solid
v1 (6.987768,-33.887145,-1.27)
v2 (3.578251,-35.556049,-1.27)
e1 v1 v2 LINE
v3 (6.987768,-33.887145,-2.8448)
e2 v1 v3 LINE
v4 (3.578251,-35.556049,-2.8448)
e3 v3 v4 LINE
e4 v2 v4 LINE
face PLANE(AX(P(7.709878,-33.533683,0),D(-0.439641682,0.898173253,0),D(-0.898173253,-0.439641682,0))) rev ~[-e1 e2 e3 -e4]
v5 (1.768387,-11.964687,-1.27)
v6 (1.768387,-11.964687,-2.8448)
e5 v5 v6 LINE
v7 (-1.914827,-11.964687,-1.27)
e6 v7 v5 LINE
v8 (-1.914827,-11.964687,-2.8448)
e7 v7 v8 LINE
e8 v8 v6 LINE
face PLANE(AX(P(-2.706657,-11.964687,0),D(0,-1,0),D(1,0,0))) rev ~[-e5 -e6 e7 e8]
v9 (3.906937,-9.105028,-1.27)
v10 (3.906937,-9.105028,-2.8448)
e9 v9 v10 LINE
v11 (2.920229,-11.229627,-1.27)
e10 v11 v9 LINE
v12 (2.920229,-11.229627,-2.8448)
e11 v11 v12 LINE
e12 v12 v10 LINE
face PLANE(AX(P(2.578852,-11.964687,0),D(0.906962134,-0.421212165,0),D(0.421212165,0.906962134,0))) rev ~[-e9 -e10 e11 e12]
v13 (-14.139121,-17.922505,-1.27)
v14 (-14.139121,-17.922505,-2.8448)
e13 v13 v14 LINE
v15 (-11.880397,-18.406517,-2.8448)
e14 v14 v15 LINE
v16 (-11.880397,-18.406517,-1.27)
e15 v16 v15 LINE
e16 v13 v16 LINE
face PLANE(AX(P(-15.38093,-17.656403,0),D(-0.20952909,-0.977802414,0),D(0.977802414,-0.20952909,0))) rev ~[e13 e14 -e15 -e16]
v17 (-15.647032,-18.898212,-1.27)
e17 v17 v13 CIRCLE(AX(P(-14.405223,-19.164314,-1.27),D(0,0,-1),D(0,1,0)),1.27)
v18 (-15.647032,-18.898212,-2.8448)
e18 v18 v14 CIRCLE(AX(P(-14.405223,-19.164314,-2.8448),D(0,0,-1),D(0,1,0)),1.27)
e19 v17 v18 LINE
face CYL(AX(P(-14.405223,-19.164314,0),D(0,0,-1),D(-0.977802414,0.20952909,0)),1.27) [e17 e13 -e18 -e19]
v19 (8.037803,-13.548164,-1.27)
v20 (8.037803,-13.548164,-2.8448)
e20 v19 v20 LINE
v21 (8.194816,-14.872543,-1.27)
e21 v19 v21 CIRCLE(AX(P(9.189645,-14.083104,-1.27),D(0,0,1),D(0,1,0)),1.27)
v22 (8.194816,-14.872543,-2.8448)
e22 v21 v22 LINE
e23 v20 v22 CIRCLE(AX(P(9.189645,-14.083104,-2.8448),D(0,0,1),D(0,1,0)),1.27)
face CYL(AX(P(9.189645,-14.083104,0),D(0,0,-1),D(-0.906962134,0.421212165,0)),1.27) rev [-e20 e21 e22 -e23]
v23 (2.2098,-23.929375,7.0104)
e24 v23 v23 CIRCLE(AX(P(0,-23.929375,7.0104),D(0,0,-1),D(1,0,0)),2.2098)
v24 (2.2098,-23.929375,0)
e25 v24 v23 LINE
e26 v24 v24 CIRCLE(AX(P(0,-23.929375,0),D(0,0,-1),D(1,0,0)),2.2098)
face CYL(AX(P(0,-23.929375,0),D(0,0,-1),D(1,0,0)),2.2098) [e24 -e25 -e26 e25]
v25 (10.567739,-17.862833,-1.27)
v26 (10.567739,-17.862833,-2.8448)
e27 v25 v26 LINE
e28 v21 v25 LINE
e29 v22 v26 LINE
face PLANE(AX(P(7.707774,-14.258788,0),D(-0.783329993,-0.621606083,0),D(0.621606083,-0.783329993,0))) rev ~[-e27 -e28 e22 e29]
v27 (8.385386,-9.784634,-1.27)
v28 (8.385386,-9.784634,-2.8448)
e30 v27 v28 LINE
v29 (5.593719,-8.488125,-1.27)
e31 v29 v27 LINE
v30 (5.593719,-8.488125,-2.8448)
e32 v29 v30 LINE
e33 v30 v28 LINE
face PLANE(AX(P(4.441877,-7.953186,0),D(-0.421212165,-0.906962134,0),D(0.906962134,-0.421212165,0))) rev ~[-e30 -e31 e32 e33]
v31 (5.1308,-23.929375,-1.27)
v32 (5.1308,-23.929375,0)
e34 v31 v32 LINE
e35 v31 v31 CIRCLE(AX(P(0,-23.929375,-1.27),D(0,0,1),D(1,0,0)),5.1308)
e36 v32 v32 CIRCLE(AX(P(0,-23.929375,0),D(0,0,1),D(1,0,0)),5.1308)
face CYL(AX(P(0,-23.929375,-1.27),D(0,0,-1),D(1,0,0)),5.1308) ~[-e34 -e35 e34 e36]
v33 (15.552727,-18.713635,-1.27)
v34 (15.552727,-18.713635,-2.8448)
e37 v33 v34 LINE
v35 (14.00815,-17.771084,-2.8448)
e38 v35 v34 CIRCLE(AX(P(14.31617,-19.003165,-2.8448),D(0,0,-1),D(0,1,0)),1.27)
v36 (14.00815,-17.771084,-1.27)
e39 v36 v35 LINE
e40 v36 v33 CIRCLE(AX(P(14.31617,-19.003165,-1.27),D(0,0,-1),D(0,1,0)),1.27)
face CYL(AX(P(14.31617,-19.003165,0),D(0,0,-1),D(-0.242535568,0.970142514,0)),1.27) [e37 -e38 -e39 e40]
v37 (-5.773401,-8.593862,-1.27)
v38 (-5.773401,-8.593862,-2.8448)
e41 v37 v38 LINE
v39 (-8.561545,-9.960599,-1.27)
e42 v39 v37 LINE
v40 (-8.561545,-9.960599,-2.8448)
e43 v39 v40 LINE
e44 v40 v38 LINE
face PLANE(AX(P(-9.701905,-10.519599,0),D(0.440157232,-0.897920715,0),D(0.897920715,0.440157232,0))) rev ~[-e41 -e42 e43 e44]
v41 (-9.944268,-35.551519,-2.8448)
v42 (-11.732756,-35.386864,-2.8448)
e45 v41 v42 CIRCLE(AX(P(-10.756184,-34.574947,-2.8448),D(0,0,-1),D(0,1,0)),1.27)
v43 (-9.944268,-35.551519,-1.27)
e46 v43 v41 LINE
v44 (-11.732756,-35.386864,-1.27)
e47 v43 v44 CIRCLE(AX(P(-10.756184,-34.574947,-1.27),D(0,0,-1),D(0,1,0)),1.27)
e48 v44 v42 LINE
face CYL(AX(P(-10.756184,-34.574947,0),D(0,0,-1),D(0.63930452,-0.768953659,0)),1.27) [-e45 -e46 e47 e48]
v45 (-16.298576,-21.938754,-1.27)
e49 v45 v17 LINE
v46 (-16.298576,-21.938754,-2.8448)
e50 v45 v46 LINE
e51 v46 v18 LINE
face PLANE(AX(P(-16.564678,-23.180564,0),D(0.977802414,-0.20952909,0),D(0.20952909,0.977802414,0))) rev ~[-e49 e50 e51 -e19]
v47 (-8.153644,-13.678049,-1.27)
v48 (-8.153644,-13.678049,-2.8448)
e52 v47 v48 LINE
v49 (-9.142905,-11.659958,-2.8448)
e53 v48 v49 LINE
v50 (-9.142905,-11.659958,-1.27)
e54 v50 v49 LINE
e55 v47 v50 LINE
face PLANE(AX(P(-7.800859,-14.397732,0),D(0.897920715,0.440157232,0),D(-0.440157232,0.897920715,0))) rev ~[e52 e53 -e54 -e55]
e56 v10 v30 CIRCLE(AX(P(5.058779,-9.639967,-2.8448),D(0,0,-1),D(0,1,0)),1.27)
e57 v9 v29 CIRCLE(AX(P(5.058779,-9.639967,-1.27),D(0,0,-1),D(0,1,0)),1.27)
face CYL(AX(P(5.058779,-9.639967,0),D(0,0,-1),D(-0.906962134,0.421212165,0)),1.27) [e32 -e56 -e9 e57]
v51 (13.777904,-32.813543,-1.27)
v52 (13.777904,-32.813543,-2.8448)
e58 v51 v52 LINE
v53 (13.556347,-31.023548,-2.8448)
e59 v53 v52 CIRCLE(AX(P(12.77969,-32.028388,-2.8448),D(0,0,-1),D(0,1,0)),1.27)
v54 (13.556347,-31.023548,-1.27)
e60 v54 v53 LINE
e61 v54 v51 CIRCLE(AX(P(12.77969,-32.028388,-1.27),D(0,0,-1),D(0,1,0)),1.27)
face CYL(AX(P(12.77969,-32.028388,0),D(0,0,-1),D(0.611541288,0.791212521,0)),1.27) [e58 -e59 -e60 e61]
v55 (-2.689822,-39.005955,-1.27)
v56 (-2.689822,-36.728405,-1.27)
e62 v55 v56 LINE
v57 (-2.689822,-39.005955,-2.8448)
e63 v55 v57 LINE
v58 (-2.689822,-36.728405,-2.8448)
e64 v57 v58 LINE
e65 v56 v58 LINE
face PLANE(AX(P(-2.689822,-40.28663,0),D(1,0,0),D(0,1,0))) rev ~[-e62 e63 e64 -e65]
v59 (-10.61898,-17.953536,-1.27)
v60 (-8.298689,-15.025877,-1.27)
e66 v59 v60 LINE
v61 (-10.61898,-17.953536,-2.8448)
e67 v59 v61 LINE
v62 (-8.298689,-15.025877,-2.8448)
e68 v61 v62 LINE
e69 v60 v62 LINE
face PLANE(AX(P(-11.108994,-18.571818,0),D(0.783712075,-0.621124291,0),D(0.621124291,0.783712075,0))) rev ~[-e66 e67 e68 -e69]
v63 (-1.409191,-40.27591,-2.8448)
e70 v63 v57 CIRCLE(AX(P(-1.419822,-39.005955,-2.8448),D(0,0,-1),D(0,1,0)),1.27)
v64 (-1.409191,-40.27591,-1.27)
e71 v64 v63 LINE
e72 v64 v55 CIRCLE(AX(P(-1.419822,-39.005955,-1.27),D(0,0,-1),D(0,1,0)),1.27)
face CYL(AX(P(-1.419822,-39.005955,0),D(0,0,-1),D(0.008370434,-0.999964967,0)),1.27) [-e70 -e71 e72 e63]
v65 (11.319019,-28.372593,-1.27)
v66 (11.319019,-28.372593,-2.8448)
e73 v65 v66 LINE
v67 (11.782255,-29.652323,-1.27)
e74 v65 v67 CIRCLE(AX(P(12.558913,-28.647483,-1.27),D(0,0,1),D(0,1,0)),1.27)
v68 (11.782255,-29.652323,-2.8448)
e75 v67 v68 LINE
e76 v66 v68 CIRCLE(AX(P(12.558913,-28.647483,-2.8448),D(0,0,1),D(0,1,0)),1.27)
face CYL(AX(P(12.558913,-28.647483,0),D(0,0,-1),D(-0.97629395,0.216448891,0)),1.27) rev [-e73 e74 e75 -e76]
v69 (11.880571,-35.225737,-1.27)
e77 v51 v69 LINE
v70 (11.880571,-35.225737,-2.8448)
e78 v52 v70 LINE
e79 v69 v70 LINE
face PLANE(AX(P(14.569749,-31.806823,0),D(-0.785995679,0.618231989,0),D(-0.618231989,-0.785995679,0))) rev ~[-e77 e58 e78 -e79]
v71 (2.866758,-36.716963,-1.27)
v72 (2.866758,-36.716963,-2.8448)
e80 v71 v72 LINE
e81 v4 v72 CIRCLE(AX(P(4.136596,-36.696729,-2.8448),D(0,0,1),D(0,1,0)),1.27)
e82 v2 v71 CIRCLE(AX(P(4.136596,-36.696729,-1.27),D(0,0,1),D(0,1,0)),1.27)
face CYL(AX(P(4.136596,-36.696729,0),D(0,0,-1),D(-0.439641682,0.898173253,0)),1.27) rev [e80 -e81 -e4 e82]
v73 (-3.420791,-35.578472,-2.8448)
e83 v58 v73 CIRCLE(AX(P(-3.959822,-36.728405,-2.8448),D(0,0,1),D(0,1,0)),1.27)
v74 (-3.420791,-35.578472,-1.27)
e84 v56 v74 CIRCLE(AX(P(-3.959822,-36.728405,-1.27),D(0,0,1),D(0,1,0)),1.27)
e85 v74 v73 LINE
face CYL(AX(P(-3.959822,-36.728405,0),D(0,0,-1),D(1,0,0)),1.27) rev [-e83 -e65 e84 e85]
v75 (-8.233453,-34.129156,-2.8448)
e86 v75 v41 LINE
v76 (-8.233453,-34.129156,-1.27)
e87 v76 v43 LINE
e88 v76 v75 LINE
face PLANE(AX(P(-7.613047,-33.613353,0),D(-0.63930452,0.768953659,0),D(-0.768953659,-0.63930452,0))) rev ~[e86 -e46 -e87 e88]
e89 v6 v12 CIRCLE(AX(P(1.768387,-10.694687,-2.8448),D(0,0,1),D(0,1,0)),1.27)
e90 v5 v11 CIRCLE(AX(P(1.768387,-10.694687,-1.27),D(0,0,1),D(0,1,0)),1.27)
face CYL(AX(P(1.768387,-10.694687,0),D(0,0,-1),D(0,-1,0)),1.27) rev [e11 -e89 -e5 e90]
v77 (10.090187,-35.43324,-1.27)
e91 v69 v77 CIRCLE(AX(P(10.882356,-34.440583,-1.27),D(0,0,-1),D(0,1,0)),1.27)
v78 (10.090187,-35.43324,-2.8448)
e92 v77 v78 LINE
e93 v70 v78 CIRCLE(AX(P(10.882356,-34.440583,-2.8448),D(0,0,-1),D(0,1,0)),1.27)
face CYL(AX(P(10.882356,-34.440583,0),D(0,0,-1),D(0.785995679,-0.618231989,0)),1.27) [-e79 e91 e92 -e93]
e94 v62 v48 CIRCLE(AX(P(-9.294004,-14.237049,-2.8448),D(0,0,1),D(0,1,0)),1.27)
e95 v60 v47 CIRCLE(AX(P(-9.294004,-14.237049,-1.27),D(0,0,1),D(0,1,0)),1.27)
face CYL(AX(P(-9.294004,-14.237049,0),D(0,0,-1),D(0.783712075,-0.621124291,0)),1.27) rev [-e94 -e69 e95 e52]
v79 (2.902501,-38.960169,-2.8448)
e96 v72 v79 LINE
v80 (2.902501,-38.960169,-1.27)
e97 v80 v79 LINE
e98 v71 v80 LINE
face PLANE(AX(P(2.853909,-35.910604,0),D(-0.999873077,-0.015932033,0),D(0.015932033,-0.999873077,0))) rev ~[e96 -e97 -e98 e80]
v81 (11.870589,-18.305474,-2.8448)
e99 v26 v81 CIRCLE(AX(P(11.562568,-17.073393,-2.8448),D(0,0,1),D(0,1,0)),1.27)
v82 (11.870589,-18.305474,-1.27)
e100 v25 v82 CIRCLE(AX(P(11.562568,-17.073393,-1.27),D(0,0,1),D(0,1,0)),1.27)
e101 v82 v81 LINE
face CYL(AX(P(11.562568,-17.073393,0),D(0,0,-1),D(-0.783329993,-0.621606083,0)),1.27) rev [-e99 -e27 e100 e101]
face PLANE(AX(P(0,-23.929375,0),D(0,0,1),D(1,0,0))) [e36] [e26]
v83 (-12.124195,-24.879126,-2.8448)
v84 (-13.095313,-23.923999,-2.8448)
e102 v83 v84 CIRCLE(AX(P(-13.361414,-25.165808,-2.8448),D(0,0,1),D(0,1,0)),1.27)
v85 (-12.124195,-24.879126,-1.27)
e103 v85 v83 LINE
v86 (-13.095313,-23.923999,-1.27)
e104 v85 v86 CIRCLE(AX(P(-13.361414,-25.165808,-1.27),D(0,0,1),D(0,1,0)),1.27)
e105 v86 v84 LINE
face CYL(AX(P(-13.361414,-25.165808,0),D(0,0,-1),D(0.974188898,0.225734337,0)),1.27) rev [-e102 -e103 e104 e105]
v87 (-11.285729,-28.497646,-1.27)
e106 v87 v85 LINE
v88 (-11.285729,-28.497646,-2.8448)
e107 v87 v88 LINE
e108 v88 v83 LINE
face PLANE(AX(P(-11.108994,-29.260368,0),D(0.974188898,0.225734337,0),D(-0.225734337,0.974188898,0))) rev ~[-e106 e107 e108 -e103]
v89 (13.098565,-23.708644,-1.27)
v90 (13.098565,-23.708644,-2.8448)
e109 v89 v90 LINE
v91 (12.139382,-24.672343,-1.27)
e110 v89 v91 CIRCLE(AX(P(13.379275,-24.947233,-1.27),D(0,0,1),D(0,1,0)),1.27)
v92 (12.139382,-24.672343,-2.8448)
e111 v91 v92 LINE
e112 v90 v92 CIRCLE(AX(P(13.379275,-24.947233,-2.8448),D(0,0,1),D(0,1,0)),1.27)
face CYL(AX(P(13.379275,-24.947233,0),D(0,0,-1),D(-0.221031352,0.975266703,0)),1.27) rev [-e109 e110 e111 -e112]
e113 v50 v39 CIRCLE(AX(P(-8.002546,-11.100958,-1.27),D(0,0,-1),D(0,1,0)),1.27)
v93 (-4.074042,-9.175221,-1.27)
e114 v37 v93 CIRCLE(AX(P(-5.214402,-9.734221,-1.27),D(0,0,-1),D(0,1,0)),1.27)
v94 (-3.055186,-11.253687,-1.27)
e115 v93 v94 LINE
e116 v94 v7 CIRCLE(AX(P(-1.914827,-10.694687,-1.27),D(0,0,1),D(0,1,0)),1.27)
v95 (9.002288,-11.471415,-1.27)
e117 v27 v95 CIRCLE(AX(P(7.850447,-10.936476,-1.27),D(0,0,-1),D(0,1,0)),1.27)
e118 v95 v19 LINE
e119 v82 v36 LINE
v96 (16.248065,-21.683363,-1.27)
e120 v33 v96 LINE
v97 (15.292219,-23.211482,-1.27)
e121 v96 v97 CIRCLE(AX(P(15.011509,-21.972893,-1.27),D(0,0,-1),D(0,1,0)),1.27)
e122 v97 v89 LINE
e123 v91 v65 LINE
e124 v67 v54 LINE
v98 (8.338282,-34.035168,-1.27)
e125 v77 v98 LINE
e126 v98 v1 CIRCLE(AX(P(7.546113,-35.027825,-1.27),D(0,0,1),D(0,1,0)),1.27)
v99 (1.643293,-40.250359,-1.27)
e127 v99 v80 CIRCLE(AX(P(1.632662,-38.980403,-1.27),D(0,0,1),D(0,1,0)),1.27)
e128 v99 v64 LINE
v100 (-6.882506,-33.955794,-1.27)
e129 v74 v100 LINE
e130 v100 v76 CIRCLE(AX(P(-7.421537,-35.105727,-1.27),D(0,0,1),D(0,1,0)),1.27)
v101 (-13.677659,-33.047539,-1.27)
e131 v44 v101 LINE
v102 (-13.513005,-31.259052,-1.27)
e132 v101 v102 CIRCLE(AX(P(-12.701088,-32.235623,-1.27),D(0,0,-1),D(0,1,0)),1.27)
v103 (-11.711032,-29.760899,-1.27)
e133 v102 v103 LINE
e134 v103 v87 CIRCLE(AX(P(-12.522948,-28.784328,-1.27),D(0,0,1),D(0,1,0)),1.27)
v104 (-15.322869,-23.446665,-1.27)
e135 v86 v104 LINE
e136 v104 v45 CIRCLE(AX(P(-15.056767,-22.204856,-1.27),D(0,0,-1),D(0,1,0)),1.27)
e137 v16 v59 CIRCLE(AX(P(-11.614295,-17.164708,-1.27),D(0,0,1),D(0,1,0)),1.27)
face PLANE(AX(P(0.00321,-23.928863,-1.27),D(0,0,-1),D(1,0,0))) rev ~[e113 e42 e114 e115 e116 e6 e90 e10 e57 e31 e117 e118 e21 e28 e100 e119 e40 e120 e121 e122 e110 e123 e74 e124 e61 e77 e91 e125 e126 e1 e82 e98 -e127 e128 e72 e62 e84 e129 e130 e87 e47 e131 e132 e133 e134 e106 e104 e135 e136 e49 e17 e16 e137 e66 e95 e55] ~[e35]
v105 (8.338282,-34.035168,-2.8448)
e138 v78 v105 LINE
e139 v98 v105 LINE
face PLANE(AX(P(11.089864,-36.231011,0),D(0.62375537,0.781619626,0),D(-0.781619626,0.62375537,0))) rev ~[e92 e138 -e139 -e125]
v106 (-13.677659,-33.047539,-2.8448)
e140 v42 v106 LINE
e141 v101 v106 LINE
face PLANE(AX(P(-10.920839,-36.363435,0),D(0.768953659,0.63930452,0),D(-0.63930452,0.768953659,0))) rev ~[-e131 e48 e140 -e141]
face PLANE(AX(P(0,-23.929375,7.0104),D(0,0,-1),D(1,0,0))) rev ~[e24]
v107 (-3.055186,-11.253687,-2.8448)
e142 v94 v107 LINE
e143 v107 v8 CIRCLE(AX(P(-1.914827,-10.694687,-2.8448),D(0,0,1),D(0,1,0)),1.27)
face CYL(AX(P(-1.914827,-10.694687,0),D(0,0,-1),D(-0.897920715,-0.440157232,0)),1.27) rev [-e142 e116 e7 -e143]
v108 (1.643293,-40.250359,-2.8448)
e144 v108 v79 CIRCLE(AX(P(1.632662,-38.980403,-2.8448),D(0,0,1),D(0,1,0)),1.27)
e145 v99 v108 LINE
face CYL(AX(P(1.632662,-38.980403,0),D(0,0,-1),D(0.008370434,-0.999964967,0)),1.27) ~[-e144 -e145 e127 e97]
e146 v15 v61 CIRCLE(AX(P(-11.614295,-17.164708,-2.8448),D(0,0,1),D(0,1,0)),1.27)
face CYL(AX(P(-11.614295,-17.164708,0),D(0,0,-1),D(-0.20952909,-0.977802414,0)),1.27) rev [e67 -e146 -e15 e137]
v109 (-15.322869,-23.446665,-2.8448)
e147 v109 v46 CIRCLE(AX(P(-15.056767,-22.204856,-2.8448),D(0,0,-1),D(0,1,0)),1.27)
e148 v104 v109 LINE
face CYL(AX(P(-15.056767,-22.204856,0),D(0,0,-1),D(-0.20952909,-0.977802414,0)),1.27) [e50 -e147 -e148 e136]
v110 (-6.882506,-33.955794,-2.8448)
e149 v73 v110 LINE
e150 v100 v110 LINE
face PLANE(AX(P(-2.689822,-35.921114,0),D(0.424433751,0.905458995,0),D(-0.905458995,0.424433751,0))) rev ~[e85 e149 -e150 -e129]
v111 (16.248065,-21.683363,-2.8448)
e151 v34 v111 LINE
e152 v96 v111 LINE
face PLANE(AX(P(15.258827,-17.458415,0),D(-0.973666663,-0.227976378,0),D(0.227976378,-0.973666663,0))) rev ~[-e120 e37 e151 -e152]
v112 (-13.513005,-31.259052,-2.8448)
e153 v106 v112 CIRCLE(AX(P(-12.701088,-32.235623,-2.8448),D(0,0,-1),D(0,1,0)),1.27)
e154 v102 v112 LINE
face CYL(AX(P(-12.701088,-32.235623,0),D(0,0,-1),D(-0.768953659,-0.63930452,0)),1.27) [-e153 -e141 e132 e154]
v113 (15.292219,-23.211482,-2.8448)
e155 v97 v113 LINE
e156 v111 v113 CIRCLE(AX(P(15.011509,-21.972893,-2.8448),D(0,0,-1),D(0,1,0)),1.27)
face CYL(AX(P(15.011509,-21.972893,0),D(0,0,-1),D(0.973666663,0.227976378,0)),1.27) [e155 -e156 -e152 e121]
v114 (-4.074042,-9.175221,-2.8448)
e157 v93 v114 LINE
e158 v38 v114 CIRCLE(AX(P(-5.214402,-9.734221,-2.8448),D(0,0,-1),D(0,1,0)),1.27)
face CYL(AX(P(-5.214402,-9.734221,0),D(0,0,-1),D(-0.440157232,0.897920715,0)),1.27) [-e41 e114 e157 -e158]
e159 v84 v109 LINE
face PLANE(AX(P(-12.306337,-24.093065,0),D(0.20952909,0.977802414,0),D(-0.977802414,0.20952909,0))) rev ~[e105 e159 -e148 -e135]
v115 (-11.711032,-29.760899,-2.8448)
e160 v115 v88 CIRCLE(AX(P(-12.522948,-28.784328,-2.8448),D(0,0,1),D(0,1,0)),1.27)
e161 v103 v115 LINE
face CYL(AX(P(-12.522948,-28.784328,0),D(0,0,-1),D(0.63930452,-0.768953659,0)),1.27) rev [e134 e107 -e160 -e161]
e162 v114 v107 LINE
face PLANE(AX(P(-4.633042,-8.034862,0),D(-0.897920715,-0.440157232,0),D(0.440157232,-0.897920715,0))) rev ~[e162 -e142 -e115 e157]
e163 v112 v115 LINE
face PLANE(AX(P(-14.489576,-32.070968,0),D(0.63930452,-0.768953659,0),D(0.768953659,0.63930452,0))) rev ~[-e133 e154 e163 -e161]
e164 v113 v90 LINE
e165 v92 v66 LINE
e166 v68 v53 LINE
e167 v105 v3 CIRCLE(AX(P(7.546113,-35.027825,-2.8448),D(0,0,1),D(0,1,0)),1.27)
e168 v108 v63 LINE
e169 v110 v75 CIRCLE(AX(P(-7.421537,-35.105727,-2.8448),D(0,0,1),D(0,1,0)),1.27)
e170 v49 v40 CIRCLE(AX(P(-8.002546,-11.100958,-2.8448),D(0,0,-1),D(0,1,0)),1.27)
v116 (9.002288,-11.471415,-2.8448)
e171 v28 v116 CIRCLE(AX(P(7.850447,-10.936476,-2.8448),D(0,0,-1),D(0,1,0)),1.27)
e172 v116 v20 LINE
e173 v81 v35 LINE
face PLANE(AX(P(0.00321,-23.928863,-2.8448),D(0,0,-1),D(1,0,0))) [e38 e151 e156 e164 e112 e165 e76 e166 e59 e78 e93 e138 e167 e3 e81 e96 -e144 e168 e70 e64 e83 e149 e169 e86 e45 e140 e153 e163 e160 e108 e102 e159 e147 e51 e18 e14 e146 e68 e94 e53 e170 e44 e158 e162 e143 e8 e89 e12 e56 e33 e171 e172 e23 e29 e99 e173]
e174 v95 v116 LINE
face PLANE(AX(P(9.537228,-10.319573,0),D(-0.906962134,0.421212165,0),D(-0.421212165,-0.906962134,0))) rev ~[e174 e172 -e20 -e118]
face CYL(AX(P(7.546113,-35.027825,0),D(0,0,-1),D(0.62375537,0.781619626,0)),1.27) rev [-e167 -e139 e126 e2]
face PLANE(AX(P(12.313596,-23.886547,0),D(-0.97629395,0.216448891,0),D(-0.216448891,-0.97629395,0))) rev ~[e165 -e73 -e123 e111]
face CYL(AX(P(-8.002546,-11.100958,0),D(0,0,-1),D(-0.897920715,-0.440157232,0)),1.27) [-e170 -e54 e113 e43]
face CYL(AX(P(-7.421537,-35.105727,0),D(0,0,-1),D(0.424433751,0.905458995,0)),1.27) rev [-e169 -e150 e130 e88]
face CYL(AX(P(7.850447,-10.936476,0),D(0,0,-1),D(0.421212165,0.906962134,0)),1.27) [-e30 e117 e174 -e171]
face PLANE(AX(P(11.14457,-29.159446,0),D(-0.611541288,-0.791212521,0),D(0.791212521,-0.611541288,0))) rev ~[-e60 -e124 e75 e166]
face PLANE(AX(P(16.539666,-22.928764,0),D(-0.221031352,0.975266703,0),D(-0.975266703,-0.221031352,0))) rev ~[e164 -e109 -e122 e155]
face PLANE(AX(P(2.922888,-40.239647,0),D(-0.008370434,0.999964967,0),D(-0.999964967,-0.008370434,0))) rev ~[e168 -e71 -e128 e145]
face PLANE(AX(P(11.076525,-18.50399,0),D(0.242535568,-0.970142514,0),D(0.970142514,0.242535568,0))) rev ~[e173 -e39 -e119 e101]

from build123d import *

# Parameters (mm, degrees)
F1_DEPTH = 2.54
F2_SCALE = 1.12
F3_R     = 1.27
F4_R     = 2.2098
F5_DEPTH = 7.0104
F6_ANGLE = 180
F7_DEPTH = 1.27
F8_R     = 5.1308
F8_R_2   = 2.2098
F9_DEPTH = 1.27


with BuildPart() as f1:
    # F0 (on Top) → F1 (new body)
    with BuildSketch(Plane.XY):
        Polygon((2.6097216178, 14.5627437159), (-2.4016266689, 14.6046923473), (-2.4016266689, 10.7069099322), (-6.7973635159, 8.6464090273), (-9.7507489845, 11.1018400639), (-12.9371215583, 7.269280193), (-9.9187448393, 4.759815731), (-10.987800546, 0.1461525389), (-14.7898914292, -0.6685812259), (-13.7329729143, -5.6008676039), (-9.9187448393, -4.7835330123), (-6.9650523365, -8.5103949532), (-8.662414737, -11.9730141014), (-4.136644538, -14.1915290003), (-2.4166579341, -10.6827564792), (2.3025460541, -10.6827564792), (3.9659612812, -14.2644541338), (8.5153820935, -12.1516080526), (6.8819414162, -8.6344521752), (9.8897544667, -4.8440932296), (13.6239528656, -5.7776425965), (14.7675592452, -0.8934023208), (10.9942825511, -0.0382388607), (9.9505092949, 4.6697063372), (13.008704409, 7.0334360935), (9.9016642198, 10.9836040065), (6.8838195875, 8.5752755404), (2.5481330231, 10.6975259259), align=None)
    extrude(amount=F1_DEPTH)


with BuildPart() as f1_1:
    # F2: moved
    add(f1.part.scale(F2_SCALE))

    # F3
    f3_edges = [f1_1.edges().sort_by_distance(p)[0] for p in [
        (-16.564678, -0.748811, 1.4224),
        (-12.306337, 0.163691, 1.4224),
        (-14.489576, 8.141594, 1.4224),
        (-10.920839, 12.434061, 1.4224),
        (-7.613047, 9.683978, 1.4224),
        (-2.689822, 11.991739, 1.4224),
        (-2.689822, 16.357255, 1.4224),
        (2.922888, 16.310273, 1.4224),
        (2.853909, 11.981229, 1.4224),
        (7.709878, 9.604309, 1.4224),
        (11.089864, 12.301636, 1.4224),
        (14.569749, 7.877448, 1.4224),
        (11.14457, 5.230071, 1.4224),
        (12.313596, -0.042828, 1.4224),
        (16.539666, -1.000611, 1.4224),
        (15.258827, -6.47096, 1.4224),
        (11.076525, -5.425384, 1.4224),
        (7.707774, -9.670586, 1.4224),
        (9.537228, -13.609801, 1.4224),
        (4.441877, -15.976189, 1.4224),
        (2.578852, -11.964687, 1.4224),
        (-2.706657, -11.964687, 1.4224),
        (-4.633042, -15.894512, 1.4224),
        (-9.701905, -13.409776, 1.4224),
        (-7.800859, -9.531642, 1.4224),
        (-11.108994, -5.357557, 1.4224),
        (-15.38093, -6.272972, 1.4224),
        (-11.108994, 5.330994, 1.4224),
    ]]
    fillet(f3_edges, radius=F3_R)

    # F4 (on face) → F5 (join)
    with BuildSketch(Plane.XY):
        Circle(F4_R)
    extrude(amount=-F5_DEPTH)


with BuildPart() as f1_2:
    # F6: moved
    add(f1_1.part.rotate(Axis((-0.0732200051, -11.9646872567, 0), (1, 0, 0)), F6_ANGLE))

    # F7 (cut): a face of the model
    f7_faces = [f1_2.faces().sort_by_distance(p)[0] for p in [
        (5.0824398182, -34.3118398385, 0),
    ]]
    extrude(f7_faces, amount=-F7_DEPTH, mode=Mode.SUBTRACT)

    # F8 (on face) → F9 (join)
    with BuildSketch(Plane.XY.offset(-1.27)):
        with Locations((0, -23.9293745135)):
            Circle(F8_R)
        with Locations((0, -23.9293745135)):
            Circle(F8_R_2, mode=Mode.SUBTRACT)
    extrude(amount=F9_DEPTH)


solid = f1_2.part
